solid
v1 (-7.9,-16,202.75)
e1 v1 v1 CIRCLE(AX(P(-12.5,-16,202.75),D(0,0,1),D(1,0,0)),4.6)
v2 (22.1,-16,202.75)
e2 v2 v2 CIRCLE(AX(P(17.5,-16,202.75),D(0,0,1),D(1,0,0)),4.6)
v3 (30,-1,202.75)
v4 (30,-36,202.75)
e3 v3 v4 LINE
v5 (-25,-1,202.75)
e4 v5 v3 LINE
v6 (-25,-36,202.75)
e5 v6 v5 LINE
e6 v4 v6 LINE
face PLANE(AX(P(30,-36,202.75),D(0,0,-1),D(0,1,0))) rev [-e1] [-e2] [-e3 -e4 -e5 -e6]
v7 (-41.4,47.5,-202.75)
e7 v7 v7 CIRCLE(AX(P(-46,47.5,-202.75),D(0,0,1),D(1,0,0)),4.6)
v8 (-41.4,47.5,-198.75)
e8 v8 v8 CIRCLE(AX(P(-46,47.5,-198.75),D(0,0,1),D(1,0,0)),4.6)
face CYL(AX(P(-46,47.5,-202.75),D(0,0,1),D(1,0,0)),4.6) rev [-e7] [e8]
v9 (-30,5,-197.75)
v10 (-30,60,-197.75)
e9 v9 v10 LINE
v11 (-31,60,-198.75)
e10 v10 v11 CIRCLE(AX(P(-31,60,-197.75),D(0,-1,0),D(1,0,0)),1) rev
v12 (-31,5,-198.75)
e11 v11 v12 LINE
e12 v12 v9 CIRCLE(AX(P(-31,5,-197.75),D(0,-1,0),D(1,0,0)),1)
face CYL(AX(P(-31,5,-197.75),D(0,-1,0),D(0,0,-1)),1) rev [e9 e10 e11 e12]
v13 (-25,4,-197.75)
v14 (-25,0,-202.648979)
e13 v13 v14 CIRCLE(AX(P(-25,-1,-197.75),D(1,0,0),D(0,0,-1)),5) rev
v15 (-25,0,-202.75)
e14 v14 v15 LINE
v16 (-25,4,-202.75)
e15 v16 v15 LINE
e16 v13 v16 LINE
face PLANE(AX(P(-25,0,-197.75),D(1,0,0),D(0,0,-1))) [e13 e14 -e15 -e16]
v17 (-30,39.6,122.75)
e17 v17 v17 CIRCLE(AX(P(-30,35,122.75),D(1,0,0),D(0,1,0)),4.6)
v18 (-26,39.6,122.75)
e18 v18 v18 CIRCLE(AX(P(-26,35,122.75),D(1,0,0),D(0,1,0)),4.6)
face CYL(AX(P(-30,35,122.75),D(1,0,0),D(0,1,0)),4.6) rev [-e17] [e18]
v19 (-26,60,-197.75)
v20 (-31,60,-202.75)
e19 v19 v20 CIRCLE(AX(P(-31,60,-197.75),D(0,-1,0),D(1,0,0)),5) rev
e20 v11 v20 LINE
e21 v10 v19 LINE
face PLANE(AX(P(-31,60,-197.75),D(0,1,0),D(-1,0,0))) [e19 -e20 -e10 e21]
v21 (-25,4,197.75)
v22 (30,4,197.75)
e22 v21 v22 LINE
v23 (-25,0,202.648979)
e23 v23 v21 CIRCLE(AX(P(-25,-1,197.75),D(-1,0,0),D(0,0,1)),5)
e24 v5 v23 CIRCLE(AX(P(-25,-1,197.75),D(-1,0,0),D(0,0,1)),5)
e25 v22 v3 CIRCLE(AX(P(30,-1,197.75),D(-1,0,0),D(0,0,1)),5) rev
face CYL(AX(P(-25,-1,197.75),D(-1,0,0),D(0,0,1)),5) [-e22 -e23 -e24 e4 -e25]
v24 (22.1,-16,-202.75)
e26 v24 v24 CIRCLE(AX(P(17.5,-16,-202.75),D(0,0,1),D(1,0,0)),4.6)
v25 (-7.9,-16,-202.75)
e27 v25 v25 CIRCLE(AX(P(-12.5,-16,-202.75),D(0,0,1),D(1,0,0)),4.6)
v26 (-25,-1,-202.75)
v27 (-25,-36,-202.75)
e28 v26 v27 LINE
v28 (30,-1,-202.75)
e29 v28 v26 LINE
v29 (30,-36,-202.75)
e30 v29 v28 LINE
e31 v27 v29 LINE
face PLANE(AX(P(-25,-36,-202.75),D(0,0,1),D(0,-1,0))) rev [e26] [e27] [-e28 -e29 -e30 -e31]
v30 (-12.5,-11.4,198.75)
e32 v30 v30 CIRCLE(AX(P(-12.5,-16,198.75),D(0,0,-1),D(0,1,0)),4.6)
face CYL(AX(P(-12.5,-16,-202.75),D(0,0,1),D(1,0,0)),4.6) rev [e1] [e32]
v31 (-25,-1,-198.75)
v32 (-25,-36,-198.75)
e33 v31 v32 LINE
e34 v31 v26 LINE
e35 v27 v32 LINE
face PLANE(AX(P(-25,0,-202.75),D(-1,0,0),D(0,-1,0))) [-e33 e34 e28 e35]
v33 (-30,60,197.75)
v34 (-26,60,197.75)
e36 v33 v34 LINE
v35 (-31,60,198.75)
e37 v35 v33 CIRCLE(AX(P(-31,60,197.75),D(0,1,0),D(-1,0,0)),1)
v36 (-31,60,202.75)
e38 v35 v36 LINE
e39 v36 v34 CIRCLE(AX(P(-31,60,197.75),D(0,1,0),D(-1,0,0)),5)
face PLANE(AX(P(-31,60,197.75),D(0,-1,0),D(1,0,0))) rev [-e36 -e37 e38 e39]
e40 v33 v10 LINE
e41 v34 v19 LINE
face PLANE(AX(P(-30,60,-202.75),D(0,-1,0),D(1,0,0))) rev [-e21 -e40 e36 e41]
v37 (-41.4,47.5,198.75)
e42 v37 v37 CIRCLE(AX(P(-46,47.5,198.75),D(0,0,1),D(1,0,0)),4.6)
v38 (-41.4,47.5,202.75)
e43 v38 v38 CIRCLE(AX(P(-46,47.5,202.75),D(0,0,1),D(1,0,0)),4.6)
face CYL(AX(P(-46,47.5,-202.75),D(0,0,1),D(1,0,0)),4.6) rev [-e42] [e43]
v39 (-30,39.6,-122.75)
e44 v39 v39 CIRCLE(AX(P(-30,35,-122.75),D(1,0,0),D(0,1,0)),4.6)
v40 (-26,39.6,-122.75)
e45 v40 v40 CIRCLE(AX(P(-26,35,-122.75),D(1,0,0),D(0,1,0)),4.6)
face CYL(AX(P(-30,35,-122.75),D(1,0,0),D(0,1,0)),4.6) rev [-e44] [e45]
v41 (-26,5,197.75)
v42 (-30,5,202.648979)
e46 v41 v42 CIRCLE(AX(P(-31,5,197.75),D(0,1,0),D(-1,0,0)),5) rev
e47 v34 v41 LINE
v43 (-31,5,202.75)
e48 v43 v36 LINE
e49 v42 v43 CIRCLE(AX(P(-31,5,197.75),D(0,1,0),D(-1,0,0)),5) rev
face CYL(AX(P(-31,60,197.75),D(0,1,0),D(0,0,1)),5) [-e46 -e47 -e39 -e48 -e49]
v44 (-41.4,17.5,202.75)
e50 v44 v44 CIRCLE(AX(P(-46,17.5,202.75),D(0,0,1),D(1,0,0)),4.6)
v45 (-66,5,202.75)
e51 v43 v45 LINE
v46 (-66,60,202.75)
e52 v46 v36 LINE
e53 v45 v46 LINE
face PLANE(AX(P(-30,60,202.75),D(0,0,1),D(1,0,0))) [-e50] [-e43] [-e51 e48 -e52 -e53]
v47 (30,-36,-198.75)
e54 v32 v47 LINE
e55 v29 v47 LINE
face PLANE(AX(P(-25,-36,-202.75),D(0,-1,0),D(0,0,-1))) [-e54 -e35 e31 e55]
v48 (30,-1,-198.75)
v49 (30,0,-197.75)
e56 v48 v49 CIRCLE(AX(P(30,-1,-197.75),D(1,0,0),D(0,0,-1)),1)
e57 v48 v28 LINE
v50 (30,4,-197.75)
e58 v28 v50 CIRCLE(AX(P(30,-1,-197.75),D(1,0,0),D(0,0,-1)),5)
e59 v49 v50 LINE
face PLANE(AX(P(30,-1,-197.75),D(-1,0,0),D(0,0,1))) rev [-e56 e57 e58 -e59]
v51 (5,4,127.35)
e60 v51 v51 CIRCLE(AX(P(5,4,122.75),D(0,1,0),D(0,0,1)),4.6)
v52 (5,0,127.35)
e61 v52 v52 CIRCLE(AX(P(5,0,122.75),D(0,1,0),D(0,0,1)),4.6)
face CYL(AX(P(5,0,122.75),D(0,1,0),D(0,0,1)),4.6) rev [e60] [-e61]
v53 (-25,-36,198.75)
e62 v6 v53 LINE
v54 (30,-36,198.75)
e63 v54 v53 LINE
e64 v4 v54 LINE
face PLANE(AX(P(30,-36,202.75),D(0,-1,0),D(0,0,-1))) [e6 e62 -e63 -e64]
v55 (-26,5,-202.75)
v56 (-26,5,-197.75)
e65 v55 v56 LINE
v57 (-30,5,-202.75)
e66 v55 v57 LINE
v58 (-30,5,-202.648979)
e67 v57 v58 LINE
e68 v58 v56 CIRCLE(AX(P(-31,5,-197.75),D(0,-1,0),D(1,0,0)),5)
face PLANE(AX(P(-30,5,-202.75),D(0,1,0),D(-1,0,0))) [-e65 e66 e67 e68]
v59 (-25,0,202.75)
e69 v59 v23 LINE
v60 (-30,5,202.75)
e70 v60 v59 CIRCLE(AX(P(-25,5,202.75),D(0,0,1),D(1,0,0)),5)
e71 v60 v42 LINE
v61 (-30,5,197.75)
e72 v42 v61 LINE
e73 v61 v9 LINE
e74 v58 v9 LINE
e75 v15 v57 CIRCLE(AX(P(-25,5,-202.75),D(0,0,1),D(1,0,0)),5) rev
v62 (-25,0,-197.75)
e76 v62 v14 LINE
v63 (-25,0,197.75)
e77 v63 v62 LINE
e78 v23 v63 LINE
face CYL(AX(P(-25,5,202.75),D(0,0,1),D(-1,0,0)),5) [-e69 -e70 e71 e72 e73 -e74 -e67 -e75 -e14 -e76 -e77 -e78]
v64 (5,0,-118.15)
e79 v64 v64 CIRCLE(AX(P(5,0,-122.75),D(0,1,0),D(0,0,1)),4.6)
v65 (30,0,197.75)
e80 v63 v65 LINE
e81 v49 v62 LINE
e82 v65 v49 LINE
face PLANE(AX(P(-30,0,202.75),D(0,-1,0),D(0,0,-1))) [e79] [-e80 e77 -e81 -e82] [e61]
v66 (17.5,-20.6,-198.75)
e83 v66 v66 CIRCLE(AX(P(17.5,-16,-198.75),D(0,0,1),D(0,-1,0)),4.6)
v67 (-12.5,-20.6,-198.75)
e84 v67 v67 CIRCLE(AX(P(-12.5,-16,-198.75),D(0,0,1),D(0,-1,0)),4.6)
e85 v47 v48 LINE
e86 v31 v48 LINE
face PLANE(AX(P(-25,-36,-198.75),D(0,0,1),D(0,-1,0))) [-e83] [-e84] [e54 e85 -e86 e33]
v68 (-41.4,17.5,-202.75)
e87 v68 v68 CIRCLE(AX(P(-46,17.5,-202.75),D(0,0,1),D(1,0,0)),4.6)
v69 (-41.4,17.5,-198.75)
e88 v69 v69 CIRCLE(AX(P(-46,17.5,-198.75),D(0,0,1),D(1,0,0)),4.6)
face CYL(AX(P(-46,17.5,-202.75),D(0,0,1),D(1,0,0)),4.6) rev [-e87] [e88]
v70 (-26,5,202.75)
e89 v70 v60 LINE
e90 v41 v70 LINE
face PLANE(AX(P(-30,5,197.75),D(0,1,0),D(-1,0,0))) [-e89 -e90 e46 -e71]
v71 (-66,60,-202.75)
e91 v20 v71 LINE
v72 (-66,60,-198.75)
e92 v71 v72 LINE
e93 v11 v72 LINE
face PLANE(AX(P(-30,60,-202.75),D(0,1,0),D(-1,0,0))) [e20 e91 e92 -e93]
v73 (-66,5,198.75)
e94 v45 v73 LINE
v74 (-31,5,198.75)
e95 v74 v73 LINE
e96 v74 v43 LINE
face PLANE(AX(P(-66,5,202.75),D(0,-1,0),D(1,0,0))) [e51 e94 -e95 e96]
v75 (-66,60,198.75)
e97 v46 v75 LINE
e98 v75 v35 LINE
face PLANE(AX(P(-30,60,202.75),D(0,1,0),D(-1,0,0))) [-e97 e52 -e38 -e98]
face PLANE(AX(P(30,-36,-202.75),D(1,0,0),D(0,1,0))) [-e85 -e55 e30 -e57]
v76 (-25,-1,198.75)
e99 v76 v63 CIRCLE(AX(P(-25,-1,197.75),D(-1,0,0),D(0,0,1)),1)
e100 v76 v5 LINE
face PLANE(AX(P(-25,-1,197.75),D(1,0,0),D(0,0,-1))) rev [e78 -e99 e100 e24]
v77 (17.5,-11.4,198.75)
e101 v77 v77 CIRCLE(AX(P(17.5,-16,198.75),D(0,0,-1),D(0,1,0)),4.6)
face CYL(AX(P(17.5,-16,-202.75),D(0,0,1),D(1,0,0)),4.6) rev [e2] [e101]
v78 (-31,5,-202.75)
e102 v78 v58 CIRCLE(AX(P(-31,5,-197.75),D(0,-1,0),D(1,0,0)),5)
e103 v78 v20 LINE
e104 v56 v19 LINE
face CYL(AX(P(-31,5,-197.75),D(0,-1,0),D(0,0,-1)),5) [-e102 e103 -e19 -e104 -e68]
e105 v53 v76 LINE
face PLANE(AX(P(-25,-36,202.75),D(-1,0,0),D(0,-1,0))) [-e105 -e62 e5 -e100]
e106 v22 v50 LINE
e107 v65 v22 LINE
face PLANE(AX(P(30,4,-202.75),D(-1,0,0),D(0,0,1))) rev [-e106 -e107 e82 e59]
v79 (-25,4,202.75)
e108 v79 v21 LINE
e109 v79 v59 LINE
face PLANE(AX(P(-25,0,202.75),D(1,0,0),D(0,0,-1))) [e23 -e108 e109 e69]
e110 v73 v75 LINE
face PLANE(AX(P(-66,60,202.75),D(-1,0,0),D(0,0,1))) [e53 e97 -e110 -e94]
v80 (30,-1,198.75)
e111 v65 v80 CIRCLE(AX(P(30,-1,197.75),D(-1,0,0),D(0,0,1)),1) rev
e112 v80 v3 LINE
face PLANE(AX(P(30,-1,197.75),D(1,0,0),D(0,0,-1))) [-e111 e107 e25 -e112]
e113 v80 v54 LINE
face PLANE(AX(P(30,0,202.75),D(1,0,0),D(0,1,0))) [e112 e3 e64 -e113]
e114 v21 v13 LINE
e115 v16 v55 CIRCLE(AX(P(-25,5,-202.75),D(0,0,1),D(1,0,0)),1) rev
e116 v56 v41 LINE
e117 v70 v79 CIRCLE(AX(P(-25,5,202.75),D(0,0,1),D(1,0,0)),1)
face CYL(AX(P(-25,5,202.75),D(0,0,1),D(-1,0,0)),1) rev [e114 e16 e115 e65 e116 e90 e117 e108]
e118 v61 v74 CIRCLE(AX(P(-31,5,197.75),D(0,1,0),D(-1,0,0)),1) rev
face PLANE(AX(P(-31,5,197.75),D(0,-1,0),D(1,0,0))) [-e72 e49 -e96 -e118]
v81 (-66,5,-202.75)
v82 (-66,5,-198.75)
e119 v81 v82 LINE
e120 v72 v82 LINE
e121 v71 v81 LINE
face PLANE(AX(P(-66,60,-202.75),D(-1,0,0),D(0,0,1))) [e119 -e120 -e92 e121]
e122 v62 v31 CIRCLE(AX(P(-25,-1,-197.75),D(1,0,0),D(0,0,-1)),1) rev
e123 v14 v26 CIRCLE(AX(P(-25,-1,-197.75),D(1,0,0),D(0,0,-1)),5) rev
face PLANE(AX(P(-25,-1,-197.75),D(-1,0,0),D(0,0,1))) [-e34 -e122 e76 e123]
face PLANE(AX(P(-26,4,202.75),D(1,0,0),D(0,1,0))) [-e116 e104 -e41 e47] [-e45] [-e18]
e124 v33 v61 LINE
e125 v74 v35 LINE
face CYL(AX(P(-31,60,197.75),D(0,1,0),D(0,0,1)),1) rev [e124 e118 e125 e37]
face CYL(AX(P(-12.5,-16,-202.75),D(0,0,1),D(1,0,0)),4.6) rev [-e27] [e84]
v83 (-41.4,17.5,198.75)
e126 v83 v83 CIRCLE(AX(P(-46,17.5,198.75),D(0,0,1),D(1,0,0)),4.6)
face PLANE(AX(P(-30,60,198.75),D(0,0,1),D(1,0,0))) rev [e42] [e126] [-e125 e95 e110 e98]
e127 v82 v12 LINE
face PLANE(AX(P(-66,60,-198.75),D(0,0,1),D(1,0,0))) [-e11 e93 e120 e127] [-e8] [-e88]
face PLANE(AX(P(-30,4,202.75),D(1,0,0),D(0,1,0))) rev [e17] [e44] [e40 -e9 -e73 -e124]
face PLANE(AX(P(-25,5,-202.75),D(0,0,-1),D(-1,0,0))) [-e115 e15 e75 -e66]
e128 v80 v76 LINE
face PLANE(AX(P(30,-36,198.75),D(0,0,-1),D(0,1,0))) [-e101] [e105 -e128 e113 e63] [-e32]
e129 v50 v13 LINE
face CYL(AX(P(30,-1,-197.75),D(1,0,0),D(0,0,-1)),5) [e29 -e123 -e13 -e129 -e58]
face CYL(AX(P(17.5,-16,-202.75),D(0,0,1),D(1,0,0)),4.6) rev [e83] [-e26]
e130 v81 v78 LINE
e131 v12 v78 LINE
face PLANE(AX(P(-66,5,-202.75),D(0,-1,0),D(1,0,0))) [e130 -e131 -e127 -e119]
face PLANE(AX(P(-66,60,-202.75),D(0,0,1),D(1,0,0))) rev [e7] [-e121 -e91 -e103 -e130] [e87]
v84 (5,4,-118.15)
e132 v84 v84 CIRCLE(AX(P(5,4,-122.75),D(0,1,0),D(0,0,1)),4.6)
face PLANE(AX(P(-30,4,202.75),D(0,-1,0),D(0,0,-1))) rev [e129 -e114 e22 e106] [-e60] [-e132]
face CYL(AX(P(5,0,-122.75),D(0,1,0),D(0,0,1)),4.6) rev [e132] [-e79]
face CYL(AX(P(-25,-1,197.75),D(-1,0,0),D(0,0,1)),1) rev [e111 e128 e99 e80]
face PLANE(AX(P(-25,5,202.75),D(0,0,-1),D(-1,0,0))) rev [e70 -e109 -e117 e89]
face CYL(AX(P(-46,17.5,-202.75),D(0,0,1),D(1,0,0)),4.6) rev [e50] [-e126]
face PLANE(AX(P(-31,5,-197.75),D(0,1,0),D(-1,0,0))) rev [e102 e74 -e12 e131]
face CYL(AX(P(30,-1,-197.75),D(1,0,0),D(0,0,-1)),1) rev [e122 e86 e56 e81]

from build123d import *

# Parameters (mm, degrees)
SKETCH1_W                      = 60
SKETCH1_H                      = 405.5
BASE_FLANGE1_DEPTH             = 4
EDGE_FLANGE1_STRIP_W           = 18
EDGE_FLANGE1_STRIP_H           = 4
EDGE_FLANGE1_STRIP_CUT_DEPTH   = 405.5
EDGE_FLANGE1_DEPTH             = 405.5
EDGE_FLANGE2_STRIP_W           = 18
EDGE_FLANGE2_STRIP_H           = 4
EDGE_FLANGE2_STRIP_CUT_DEPTH   = 55
EDGE_FLANGE2_STRIP_2_W         = 18
EDGE_FLANGE2_STRIP_2_H         = 4
EDGE_FLANGE2_STRIP_CUT_2_DEPTH = 55
EDGE_FLANGE2_STRIP_3_W         = 18
EDGE_FLANGE2_STRIP_3_H         = 4
EDGE_FLANGE2_STRIP_CUT_3_DEPTH = 55
EDGE_FLANGE2_STRIP_4_W         = 18
EDGE_FLANGE2_STRIP_4_H         = 4
EDGE_FLANGE2_STRIP_CUT_4_DEPTH = 55
EDGE_FLANGE2_DEPTH             = 55
EDGE_FLANGE2_BEND_DEPTH        = 55
EDGE_FLANGE2_BEND_2_DEPTH      = 55
EDGE_FLANGE2_BEND_3_DEPTH      = 55
SKETCH18_R                     = 4.6
EXTRUDE1_DEPTH                 = 416.194231655
SKETCH19_R                     = 4.6
EXTRUDE2_DEPTH                 = 4
SKETCH20_R                     = 4.6
EXTRUDE3_DEPTH                 = 4


# Sheet-metal steps are written as plain solids
with BuildPart() as part:
    # Sketch1 → Base-Flange1 (new body)
    with BuildSketch(Plane(origin=(0, 0, 0), x_dir=(1, 0, 0), z_dir=(0, 1, 0))):
        Rectangle(SKETCH1_W, SKETCH1_H)
    extrude(amount=BASE_FLANGE1_DEPTH)

    # Edge-Flange1 strip (across the edge) → Edge-Flange1 strip cut (cut)
    with BuildSketch(Plane(origin=(-30, 4, -202.75), x_dir=(1, 0, 0), z_dir=(0, 0, 1))):
        with Locations((-4, -2)):
            Rectangle(EDGE_FLANGE1_STRIP_W, EDGE_FLANGE1_STRIP_H)
    extrude(amount=EDGE_FLANGE1_STRIP_CUT_DEPTH, mode=Mode.SUBTRACT)

    # Edge-Flange1 section (across the edge) → Edge-Flange1 (add)
    with BuildSketch(Plane(origin=(-30, 4, -202.75), x_dir=(1, 0, 0), z_dir=(0, 0, 1))):
        with BuildLine():
            Line((0, 1), (0, 56))
            Line((0, 56), (4, 56))
            Line((4, 56), (4, 1))
            ThreePointArc((4, 1), (4.292893219, 0.292893219), (5, 0))
            Line((5, 0), (5, -4))
            ThreePointArc((5, -4), (1.464466094, -2.535533906), (0, 1))
        make_face()
    extrude(amount=EDGE_FLANGE1_DEPTH)

    # Edge-Flange2 strip (across the edge) → Edge-Flange2 strip cut (cut)
    with BuildSketch(Plane(origin=(-30, 5, 202.75), x_dir=(0, 0, -1), z_dir=(0, 1, 0))):
        with Locations((-4, -2)):
            Rectangle(EDGE_FLANGE2_STRIP_W, EDGE_FLANGE2_STRIP_H)
    extrude(amount=EDGE_FLANGE2_STRIP_CUT_DEPTH, mode=Mode.SUBTRACT)

    # Edge-Flange2 strip 2 (across the edge) → Edge-Flange2 strip cut 2 (cut)
    with BuildSketch(Plane(origin=(30, 0, 202.75), x_dir=(0, 0, -1), z_dir=(-1, 0, 0))):
        with Locations((-4, -2)):
            Rectangle(EDGE_FLANGE2_STRIP_2_W, EDGE_FLANGE2_STRIP_2_H)
    extrude(amount=EDGE_FLANGE2_STRIP_CUT_2_DEPTH, mode=Mode.SUBTRACT)

    # Edge-Flange2 strip 3 (across the edge) → Edge-Flange2 strip cut 3 (cut)
    with BuildSketch(Plane(origin=(-30, 60, -202.75), x_dir=(0, 0, 1), z_dir=(0, -1, 0))):
        with Locations((-4, -2)):
            Rectangle(EDGE_FLANGE2_STRIP_3_W, EDGE_FLANGE2_STRIP_3_H)
    extrude(amount=EDGE_FLANGE2_STRIP_CUT_3_DEPTH, mode=Mode.SUBTRACT)

    # Edge-Flange2 strip 4 (across the edge) → Edge-Flange2 strip cut 4 (cut)
    with BuildSketch(Plane(origin=(-25, 0, -202.75), x_dir=(0, 0, 1), z_dir=(1, 0, 0))):
        with Locations((-4, -2)):
            Rectangle(EDGE_FLANGE2_STRIP_4_W, EDGE_FLANGE2_STRIP_4_H)
    extrude(amount=EDGE_FLANGE2_STRIP_CUT_4_DEPTH, mode=Mode.SUBTRACT)

    # Edge-Flange2 section (across the edge) → Edge-Flange2 (add)
    with BuildSketch(Plane(origin=(-30, 5, 202.75), x_dir=(0, 0, -1), z_dir=(0, 1, 0))):
        with BuildLine():
            Line((0, 1), (0, 36))
            Line((0, 36), (4, 36))
            Line((4, 36), (4, 1))
            ThreePointArc((4, 1), (4.292893219, 0.292893219), (5, 0))
            Line((5, 0), (5, -4))
            ThreePointArc((5, -4), (1.464466094, -2.535533906), (0, 1))
        make_face()
    extrude(amount=EDGE_FLANGE2_DEPTH)

    # Edge-Flange2 section 2 (across the edge) → Edge-Flange2 bend (add)
    with BuildSketch(Plane(origin=(30, 0, 202.75), x_dir=(0, 0, -1), z_dir=(-1, 0, 0))):
        with BuildLine():
            Line((0, 1), (0, 36))
            Line((0, 36), (4, 36))
            Line((4, 36), (4, 1))
            ThreePointArc((4, 1), (4.292893219, 0.292893219), (5, 0))
            Line((5, 0), (5, -4))
            ThreePointArc((5, -4), (1.464466094, -2.535533906), (0, 1))
        make_face()
    extrude(amount=EDGE_FLANGE2_BEND_DEPTH)

    # Edge-Flange2 section 3 (across the edge) → Edge-Flange2 bend 2 (add)
    with BuildSketch(Plane(origin=(-30, 60, -202.75), x_dir=(0, 0, 1), z_dir=(0, -1, 0))):
        with BuildLine():
            Line((0, 1), (0, 36))
            Line((0, 36), (4, 36))
            Line((4, 36), (4, 1))
            ThreePointArc((4, 1), (4.292893219, 0.292893219), (5, 0))
            Line((5, 0), (5, -4))
            ThreePointArc((5, -4), (1.464466094, -2.535533906), (0, 1))
        make_face()
    extrude(amount=EDGE_FLANGE2_BEND_2_DEPTH)

    # Edge-Flange2 section 4 (across the edge) → Edge-Flange2 bend 3 (add)
    with BuildSketch(Plane(origin=(-25, 0, -202.75), x_dir=(0, 0, 1), z_dir=(1, 0, 0))):
        with BuildLine():
            Line((0, 1), (0, 36))
            Line((0, 36), (4, 36))
            Line((4, 36), (4, 1))
            ThreePointArc((4, 1), (4.292893219, 0.292893219), (5, 0))
            Line((5, 0), (5, -4))
            ThreePointArc((5, -4), (1.464466094, -2.535533906), (0, 1))
        make_face()
    extrude(amount=EDGE_FLANGE2_BEND_3_DEPTH)

    # Sketch18 → Extrude1 (cut, through all)
    with BuildSketch(Plane.XY.offset(202.75)):
        with Locations((-46, 47.5)):
            Circle(SKETCH18_R)
        with Locations((-46, 17.5)):
            Circle(SKETCH18_R)
        with Locations((-12.5, -16)):
            Circle(SKETCH18_R)
        with Locations((17.5, -16)):
            Circle(SKETCH18_R)
    extrude(amount=-EXTRUDE1_DEPTH, mode=Mode.SUBTRACT)

    # Sketch19 → Extrude2 (cut)
    with BuildSketch(Plane(origin=(-26, 0, 0), x_dir=(0, 0, -1), z_dir=(1, 0, 0))):
        with Locations(Location((-122.75, 35, 0), (0, 0, 90))):
            Circle(SKETCH19_R)
        with Locations(Location((122.75, 35, 0), (0, 0, 90))):
            Circle(SKETCH19_R)
    extrude(amount=-EXTRUDE2_DEPTH, mode=Mode.SUBTRACT)

    # Sketch20 → Extrude3 (cut)
    with BuildSketch(Plane(origin=(0, 4, 0), x_dir=(1, 0, 0), z_dir=(0, 1, 0))):
        with Locations(Location((5, 122.75, 0), (0, 0, 270))):
            Circle(SKETCH20_R)
        with Locations(Location((5, -122.75, 0), (0, 0, 270))):
            Circle(SKETCH20_R)
    extrude(amount=-EXTRUDE3_DEPTH, mode=Mode.SUBTRACT)


solid = part.part
